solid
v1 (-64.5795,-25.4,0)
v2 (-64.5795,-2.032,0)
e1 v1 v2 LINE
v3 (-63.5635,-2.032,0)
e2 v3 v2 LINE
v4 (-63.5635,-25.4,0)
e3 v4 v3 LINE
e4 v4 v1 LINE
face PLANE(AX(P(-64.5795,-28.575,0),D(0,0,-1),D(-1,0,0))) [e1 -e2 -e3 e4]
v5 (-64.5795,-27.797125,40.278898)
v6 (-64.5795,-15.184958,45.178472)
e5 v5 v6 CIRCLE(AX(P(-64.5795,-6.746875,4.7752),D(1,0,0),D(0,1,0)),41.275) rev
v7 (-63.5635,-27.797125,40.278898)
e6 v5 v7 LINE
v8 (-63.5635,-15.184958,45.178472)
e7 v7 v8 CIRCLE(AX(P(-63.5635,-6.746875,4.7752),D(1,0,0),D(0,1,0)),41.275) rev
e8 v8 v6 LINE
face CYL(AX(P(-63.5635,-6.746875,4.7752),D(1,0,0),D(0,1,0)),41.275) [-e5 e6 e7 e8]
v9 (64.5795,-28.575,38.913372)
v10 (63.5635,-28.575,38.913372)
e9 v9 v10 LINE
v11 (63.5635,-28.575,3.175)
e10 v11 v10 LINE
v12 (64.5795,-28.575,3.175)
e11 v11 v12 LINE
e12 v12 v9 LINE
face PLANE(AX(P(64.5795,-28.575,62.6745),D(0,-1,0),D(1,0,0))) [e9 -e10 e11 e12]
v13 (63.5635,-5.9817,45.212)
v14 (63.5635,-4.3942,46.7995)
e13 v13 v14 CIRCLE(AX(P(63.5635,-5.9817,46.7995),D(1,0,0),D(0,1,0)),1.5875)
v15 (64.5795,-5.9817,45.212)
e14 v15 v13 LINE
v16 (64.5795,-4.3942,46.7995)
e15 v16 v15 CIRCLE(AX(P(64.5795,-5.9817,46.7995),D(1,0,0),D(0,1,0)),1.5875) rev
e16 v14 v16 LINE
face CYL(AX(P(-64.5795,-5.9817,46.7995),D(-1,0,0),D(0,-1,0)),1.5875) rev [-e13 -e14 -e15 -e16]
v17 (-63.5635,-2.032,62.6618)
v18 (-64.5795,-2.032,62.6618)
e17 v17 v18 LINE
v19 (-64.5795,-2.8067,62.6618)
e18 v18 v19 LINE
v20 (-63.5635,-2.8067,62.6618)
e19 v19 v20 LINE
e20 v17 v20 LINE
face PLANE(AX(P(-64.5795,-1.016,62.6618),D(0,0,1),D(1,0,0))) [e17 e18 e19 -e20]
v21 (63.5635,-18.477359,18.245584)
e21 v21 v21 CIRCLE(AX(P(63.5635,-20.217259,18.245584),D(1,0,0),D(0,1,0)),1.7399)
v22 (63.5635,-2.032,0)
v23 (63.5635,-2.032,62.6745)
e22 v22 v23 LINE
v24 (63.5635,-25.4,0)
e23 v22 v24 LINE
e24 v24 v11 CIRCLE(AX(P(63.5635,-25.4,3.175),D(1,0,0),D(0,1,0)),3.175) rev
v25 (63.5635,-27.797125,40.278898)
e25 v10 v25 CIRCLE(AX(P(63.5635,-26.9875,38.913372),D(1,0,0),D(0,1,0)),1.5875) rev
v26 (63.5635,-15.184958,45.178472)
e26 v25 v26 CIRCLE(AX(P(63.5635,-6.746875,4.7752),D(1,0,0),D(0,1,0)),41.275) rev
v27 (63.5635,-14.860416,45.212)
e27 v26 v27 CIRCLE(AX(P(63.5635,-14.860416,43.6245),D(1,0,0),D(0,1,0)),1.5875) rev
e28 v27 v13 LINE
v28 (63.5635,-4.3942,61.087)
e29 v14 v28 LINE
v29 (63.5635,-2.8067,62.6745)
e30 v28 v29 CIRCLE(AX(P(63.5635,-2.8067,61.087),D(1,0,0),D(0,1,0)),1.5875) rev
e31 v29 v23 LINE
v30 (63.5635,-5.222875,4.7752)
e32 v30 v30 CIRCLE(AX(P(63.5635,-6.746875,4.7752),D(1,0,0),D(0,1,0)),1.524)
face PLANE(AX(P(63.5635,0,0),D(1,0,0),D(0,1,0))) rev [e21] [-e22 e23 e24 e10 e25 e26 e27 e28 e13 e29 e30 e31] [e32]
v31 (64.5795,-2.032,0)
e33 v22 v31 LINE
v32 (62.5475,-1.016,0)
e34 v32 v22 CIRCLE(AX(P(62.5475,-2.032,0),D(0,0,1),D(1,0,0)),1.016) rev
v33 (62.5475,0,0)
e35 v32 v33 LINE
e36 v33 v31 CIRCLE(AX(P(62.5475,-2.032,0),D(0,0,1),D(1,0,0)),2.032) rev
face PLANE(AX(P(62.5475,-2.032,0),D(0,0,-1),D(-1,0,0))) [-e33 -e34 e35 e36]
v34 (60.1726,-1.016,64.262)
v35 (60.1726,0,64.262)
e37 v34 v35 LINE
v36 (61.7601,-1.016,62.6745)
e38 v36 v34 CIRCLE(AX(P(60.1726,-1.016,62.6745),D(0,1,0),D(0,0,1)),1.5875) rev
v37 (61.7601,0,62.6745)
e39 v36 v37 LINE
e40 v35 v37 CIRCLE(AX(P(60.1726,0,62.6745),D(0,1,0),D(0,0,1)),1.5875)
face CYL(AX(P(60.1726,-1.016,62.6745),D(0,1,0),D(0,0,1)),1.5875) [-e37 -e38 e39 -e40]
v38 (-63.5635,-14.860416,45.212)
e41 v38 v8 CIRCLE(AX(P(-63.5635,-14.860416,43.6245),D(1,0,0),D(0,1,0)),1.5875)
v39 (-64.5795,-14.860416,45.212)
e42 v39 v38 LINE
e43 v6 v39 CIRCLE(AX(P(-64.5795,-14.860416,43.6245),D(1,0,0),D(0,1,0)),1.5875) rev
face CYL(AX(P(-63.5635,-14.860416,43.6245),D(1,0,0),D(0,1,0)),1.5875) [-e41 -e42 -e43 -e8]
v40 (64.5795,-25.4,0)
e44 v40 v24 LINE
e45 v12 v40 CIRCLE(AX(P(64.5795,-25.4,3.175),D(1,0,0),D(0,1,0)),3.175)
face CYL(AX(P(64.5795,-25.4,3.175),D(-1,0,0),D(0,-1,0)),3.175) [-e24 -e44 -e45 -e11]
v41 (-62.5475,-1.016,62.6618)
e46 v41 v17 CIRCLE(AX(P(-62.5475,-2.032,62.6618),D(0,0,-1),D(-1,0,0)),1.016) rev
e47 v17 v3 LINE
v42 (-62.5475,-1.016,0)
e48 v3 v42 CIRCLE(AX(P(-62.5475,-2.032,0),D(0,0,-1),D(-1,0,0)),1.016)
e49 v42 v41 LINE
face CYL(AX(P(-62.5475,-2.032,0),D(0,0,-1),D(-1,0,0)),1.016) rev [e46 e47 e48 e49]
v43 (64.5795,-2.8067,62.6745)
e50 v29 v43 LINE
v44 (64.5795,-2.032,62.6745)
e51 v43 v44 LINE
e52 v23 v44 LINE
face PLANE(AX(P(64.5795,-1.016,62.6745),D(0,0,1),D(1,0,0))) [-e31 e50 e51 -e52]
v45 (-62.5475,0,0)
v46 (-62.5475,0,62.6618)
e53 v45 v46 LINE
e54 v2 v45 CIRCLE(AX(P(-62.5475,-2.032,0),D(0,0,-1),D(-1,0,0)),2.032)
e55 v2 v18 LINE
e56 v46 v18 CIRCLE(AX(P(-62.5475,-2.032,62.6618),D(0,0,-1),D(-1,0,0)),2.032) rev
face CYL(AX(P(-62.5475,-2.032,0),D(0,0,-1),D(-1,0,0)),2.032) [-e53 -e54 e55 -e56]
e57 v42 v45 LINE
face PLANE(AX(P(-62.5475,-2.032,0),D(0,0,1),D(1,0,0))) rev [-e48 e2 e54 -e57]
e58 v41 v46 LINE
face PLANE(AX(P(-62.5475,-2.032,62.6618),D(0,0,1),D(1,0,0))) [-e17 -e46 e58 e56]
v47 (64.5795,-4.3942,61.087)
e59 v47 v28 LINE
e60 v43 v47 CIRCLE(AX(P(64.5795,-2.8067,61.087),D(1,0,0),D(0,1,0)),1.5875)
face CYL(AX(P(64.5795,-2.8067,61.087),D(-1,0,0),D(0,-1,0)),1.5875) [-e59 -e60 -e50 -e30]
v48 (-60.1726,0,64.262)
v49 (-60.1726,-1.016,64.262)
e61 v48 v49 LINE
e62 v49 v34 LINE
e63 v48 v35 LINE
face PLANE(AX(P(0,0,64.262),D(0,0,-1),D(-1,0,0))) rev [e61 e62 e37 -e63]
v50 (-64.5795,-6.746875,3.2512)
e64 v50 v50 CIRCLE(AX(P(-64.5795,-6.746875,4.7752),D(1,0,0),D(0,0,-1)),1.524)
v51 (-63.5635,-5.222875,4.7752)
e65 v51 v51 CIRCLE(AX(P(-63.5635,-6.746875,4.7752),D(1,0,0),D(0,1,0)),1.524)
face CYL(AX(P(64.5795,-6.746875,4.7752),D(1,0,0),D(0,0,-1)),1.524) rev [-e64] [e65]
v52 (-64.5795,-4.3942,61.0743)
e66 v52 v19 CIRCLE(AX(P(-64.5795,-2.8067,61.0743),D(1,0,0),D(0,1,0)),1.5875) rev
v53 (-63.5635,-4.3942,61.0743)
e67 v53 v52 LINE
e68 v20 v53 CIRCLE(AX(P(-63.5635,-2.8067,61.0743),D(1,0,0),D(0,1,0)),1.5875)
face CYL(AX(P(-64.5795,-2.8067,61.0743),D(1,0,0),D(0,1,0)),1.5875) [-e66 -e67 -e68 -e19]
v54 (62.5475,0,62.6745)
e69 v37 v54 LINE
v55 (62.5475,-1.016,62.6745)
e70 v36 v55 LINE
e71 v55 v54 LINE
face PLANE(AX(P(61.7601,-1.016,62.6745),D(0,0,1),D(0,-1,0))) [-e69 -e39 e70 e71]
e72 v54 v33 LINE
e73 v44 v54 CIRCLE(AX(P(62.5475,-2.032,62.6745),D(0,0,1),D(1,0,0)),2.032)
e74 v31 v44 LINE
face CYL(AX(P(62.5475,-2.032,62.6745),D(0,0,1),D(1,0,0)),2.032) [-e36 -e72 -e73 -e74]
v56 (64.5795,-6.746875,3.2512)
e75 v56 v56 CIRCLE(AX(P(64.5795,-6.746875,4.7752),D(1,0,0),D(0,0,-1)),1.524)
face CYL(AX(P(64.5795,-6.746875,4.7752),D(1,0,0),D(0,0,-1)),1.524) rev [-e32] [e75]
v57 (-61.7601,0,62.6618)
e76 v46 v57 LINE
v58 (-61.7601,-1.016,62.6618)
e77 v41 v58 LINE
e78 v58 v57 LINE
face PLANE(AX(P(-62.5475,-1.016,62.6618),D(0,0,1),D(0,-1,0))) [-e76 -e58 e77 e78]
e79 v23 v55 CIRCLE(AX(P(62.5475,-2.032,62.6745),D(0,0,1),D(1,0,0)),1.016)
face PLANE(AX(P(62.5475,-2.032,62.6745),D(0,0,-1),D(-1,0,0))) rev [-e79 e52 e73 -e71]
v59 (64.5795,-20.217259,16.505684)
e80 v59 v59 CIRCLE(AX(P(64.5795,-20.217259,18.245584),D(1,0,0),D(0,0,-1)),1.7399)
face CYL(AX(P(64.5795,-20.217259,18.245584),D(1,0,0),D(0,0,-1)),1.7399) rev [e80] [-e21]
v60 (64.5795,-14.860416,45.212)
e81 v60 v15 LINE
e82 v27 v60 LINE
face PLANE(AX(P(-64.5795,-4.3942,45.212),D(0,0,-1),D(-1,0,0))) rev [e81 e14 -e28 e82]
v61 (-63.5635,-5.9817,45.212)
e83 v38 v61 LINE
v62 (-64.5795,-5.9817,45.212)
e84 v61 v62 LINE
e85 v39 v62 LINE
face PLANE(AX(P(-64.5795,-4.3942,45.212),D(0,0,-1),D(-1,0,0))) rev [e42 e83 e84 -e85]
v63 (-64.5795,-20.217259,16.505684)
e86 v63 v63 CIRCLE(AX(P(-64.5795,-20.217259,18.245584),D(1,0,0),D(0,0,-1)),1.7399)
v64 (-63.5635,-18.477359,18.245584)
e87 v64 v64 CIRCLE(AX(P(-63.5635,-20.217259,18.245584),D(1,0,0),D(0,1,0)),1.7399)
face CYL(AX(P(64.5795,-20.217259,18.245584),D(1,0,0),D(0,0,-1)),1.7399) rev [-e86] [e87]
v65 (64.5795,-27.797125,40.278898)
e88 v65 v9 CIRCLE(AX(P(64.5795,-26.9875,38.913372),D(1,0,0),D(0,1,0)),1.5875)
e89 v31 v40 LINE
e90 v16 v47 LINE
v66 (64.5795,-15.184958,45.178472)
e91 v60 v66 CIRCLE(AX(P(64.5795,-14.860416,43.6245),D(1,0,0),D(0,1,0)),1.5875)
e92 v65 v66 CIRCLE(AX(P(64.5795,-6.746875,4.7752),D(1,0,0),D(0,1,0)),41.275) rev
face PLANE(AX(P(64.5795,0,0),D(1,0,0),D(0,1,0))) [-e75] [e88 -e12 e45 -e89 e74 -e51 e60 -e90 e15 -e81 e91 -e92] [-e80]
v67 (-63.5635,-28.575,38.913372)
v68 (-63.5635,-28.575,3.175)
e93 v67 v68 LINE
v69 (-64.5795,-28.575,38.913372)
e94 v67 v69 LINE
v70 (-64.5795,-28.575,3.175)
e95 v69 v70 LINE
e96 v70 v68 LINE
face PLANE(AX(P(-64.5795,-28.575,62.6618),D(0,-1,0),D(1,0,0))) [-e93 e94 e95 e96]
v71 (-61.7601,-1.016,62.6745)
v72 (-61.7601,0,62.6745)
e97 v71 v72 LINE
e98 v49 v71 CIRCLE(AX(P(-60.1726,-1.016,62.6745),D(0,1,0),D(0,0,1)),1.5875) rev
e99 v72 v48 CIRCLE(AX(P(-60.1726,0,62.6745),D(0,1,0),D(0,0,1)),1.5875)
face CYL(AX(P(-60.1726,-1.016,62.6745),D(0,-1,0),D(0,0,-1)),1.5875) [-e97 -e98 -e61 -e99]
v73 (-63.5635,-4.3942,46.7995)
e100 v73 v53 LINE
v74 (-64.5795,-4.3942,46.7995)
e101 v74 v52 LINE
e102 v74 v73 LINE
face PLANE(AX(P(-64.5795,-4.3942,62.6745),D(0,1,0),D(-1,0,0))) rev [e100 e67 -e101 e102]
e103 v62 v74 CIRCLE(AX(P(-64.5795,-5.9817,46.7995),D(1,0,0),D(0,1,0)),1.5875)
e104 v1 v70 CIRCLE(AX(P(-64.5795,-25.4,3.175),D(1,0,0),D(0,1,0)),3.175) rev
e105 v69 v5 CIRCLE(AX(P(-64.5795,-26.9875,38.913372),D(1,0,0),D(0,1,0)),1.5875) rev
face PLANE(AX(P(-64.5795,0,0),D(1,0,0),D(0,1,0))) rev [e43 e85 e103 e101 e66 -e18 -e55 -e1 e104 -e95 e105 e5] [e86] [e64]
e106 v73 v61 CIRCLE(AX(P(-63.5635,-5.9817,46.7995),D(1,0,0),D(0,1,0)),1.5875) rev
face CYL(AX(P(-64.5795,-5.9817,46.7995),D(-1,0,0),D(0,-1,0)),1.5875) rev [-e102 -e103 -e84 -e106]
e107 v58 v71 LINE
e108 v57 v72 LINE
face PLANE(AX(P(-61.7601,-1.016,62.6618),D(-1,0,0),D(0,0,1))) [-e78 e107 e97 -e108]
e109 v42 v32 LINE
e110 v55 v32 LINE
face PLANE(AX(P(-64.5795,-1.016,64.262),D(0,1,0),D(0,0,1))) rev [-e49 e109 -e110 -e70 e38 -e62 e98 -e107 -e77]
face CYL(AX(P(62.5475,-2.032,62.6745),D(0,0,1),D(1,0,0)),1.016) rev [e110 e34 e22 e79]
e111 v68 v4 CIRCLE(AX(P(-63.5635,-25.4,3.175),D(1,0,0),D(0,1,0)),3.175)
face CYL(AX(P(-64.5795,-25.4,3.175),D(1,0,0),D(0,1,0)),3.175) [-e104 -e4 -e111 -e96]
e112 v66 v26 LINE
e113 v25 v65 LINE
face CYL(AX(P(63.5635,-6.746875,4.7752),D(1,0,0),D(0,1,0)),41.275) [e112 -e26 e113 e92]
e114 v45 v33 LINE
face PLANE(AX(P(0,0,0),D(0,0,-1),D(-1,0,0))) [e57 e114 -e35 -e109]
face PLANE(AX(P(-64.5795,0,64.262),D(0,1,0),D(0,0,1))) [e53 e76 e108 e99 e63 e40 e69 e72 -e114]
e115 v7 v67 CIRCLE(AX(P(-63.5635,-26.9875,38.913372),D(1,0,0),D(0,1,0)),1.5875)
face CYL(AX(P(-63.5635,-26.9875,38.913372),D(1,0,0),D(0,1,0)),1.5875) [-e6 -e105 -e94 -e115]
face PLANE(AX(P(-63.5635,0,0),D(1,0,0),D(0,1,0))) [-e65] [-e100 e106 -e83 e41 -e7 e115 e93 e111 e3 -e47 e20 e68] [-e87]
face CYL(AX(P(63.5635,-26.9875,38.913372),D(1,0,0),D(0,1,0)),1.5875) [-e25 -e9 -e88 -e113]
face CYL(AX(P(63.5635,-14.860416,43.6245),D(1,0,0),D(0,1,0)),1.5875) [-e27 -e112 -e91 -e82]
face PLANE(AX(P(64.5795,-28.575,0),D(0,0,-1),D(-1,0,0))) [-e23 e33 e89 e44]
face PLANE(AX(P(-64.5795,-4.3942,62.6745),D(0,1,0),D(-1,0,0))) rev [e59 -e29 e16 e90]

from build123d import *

# Parameters (mm, degrees)
SKETCH1_W                       = 129.159
SKETCH1_H                       = 1.016
BASE_FLANGE1_DEPTH              = 64.262
EDGE_FLANGE1_STRIP_W            = 6.096
EDGE_FLANGE1_STRIP_H            = 1.016
EDGE_FLANGE1_STRIP_CUT_DEPTH    = 62.6745
EDGE_FLANGE1_RELIEF_W           = 6.8834
EDGE_FLANGE1_RELIEF_H           = 1.6002
EDGE_FLANGE1_RELIEF_CUT_DEPTH   = 1.016
EDGE_FLANGE1_STRIP_2_W          = 6.096
EDGE_FLANGE1_STRIP_2_H          = 1.016
EDGE_FLANGE1_STRIP_CUT_2_DEPTH  = 62.6618
EDGE_FLANGE1_RELIEF_2_W         = 6.8834
EDGE_FLANGE1_RELIEF_2_H         = 1.6002
EDGE_FLANGE1_RELIEF_CUT_2_DEPTH = 1.016
EDGE_FLANGE1_DEPTH              = 62.6745
EDGE_FLANGE1_BEND_DEPTH         = 62.6618
BREAK_CORNER1_START             = -64.5795
BREAK_CORNER1_DEPTH             = 129.159
F_1_8_0_125_DIAMETER_HOLE1_D    = 3.048
BREAK_CORNER2_START             = -1.016
BREAK_CORNER2_DEPTH             = 1.016
F_1_8_0_125_DIAMETER_HOLE4_D    = 3.4798
SKETCH20_W                      = 17.4625
SKETCH20_H                      = 24.1808
CUT_EXTRUDE4_DEPTH              = 148.065232295
CUT_EXTRUDE5_DEPTH              = 148.065232295
FILLET3_R                       = 1.5875


# Read off the part's stored shape, not the designer's step: Break-Corner1, Break-Corner2
# Sheet-metal steps are written as plain solids
with BuildPart() as part:
    # Sketch1 → Base-Flange1 (new body)
    with BuildSketch(Plane.XY):
        with Locations((0, -0.508)):
            Rectangle(SKETCH1_W, SKETCH1_H)
    extrude(amount=BASE_FLANGE1_DEPTH)

    # Edge-Flange1 strip (across the edge) → Edge-Flange1 strip cut (cut)
    with BuildSketch(Plane(origin=(64.5795, -1.016, 0), x_dir=(-1, 0, 0), z_dir=(0, 0, 1))):
        with Locations((-1.016, -0.508)):
            Rectangle(EDGE_FLANGE1_STRIP_W, EDGE_FLANGE1_STRIP_H)
    extrude(amount=EDGE_FLANGE1_STRIP_CUT_DEPTH, mode=Mode.SUBTRACT)

    # Edge-Flange1 relief (on the sheet) → Edge-Flange1 relief cut (cut)
    with BuildSketch(Plane(origin=(62.5475, -1.016, 0), x_dir=(-1, 0, 0), z_dir=(0, -1, 0))):
        with Locations((-2.6543, -63.4746)):
            Rectangle(EDGE_FLANGE1_RELIEF_W, EDGE_FLANGE1_RELIEF_H)
    extrude(amount=-EDGE_FLANGE1_RELIEF_CUT_DEPTH, mode=Mode.SUBTRACT)

    # Edge-Flange1 strip 2 (across the edge) → Edge-Flange1 strip cut 2 (cut)
    with BuildSketch(Plane(origin=(-64.5795, -1.016, 62.6618), x_dir=(1, 0, 0), z_dir=(0, 0, -1))):
        with Locations((-1.016, -0.508)):
            Rectangle(EDGE_FLANGE1_STRIP_2_W, EDGE_FLANGE1_STRIP_2_H)
    extrude(amount=EDGE_FLANGE1_STRIP_CUT_2_DEPTH, mode=Mode.SUBTRACT)

    # Edge-Flange1 relief 2 (on the sheet) → Edge-Flange1 relief cut 2 (cut)
    with BuildSketch(Plane(origin=(-62.5475, -1.016, 62.6618), x_dir=(1, 0, 0), z_dir=(0, -1, 0))):
        with Locations((-2.6543, 0.8001)):
            Rectangle(EDGE_FLANGE1_RELIEF_2_W, EDGE_FLANGE1_RELIEF_2_H)
    extrude(amount=-EDGE_FLANGE1_RELIEF_CUT_2_DEPTH, mode=Mode.SUBTRACT)

    # Edge-Flange1 section (across the edge) → Edge-Flange1 (add)
    with BuildSketch(Plane(origin=(64.5795, -1.016, 0), x_dir=(-1, 0, 0), z_dir=(0, 0, 1))):
        with BuildLine():
            Line((0, 1.016), (0, 27.559))
            Line((0, 27.559), (1.016, 27.559))
            Line((1.016, 27.559), (1.016, 1.016))
            ThreePointArc((1.016, 1.016), (1.31357951, 0.29757951), (2.032, 0))
            Line((2.032, 0), (2.032, -1.016))
            ThreePointArc((2.032, -1.016), (0.595159021, -0.420840979), (0, 1.016))
        make_face()
    extrude(amount=EDGE_FLANGE1_DEPTH)

    # Edge-Flange1 section 2 (across the edge) → Edge-Flange1 bend (add)
    with BuildSketch(Plane(origin=(-64.5795, -1.016, 62.6618), x_dir=(1, 0, 0), z_dir=(0, 0, -1))):
        with BuildLine():
            Line((0, 1.016), (0, 27.559))
            Line((0, 27.559), (1.016, 27.559))
            Line((1.016, 27.559), (1.016, 1.016))
            ThreePointArc((1.016, 1.016), (1.31357951, 0.29757951), (2.032, 0))
            Line((2.032, 0), (2.032, -1.016))
            ThreePointArc((2.032, -1.016), (0.595159021, -0.420840979), (0, 1.016))
        make_face()
    extrude(amount=EDGE_FLANGE1_BEND_DEPTH)

    # Break-Corner1 outline → Break-Corner1 (cut)
    with BuildSketch(Plane.YZ.offset(BREAK_CORNER1_START)):
        with BuildLine():
            ThreePointArc((-25.4, 0), (-27.64506403, 0.92993597), (-28.575, 3.175))
            Line((-28.575, 3.175), (-28.575, 0))
            Line((-28.575, 0), (-25.4, 0))
        make_face()
    extrude(amount=BREAK_CORNER1_DEPTH, mode=Mode.SUBTRACT)

    # 1/8 (0.125) Diameter Hole1 (through all)
    with Locations(Plane(origin=(64.5795, 0, 0), x_dir=(0, 0, -1), z_dir=(1, 0, 0))):
        with Locations((-4.7752, -6.746875)):
            Hole(F_1_8_0_125_DIAMETER_HOLE1_D / 2)

    # Break-Corner2 outline → Break-Corner2 (cut)
    with BuildSketch(Plane(origin=(0, 0, 0), x_dir=(1, 0, 0), z_dir=(0, 1, 0)).offset(BREAK_CORNER2_START)):
        with BuildLine():
            Line((-61.7601, -64.262), (-60.1726, -64.262))
            ThreePointArc((-60.1726, -64.262), (-61.295132015, -63.797032015), (-61.7601, -62.6745))
            Line((-61.7601, -62.6745), (-61.7601, -64.262))
        make_face()
        with BuildLine():
            ThreePointArc((61.7601, -62.6745), (61.295132015, -63.797032015), (60.1726, -64.262))
            Line((60.1726, -64.262), (61.7601, -64.262))
            Line((61.7601, -64.262), (61.7601, -62.6745))
        make_face()
    extrude(amount=BREAK_CORNER2_DEPTH, mode=Mode.SUBTRACT)

    # 1/8 (0.125) Diameter Hole4 (through all)
    with Locations(Plane(origin=(64.5795, 0, 0), x_dir=(0, 0, -1), z_dir=(1, 0, 0))):
        with Locations((-18.245584182, -20.217259182)):
            Hole(F_1_8_0_125_DIAMETER_HOLE4_D / 2)

    # Sketch20 → Cut-Extrude4 (cut, through all)
    with BuildSketch(Plane(origin=(64.5795, 0, 0), x_dir=(0, 0, -1), z_dir=(1, 0, 0))):
        with Locations((-53.94325, -16.4846)):
            Rectangle(SKETCH20_W, SKETCH20_H)
    extrude(amount=-CUT_EXTRUDE4_DEPTH, mode=Mode.SUBTRACT)

    # Sketch21 → Cut-Extrude5 (cut, through all)
    with BuildSketch(Plane(origin=(64.5795, 0, 0), x_dir=(0, 0, -1), z_dir=(1, 0, 0))):
        with BuildLine():
            Line((-39.806023342, -28.575), (-45.212, -28.575))
            Line((-45.212, -28.575), (-45.212, -15.022793726))
            ThreePointArc((-45.212, -15.022793726), (-43.112598411, -22.039667684), (-39.806023342, -28.575))
        make_face()
    extrude(amount=-CUT_EXTRUDE5_DEPTH, mode=Mode.SUBTRACT)

    # Fillet3
    fillet3_edges = [part.edges().sort_by_distance(p)[0] for p in [
        (64.0715, -4.3942, 62.6745),
        (-64.0715, -4.3942, 62.6618),
        (64.0715, -4.3942, 45.212),
        (-64.0715, -4.3942, 45.212),
        (64.0715, -15.022793726, 45.212),
        (64.0715, -28.575, 39.806023342),
        (-64.0715, -15.022793726, 45.212),
        (-64.0715, -28.575, 39.806023342),
    ]]
    fillet(fillet3_edges, radius=FILLET3_R)


solid = part.part
